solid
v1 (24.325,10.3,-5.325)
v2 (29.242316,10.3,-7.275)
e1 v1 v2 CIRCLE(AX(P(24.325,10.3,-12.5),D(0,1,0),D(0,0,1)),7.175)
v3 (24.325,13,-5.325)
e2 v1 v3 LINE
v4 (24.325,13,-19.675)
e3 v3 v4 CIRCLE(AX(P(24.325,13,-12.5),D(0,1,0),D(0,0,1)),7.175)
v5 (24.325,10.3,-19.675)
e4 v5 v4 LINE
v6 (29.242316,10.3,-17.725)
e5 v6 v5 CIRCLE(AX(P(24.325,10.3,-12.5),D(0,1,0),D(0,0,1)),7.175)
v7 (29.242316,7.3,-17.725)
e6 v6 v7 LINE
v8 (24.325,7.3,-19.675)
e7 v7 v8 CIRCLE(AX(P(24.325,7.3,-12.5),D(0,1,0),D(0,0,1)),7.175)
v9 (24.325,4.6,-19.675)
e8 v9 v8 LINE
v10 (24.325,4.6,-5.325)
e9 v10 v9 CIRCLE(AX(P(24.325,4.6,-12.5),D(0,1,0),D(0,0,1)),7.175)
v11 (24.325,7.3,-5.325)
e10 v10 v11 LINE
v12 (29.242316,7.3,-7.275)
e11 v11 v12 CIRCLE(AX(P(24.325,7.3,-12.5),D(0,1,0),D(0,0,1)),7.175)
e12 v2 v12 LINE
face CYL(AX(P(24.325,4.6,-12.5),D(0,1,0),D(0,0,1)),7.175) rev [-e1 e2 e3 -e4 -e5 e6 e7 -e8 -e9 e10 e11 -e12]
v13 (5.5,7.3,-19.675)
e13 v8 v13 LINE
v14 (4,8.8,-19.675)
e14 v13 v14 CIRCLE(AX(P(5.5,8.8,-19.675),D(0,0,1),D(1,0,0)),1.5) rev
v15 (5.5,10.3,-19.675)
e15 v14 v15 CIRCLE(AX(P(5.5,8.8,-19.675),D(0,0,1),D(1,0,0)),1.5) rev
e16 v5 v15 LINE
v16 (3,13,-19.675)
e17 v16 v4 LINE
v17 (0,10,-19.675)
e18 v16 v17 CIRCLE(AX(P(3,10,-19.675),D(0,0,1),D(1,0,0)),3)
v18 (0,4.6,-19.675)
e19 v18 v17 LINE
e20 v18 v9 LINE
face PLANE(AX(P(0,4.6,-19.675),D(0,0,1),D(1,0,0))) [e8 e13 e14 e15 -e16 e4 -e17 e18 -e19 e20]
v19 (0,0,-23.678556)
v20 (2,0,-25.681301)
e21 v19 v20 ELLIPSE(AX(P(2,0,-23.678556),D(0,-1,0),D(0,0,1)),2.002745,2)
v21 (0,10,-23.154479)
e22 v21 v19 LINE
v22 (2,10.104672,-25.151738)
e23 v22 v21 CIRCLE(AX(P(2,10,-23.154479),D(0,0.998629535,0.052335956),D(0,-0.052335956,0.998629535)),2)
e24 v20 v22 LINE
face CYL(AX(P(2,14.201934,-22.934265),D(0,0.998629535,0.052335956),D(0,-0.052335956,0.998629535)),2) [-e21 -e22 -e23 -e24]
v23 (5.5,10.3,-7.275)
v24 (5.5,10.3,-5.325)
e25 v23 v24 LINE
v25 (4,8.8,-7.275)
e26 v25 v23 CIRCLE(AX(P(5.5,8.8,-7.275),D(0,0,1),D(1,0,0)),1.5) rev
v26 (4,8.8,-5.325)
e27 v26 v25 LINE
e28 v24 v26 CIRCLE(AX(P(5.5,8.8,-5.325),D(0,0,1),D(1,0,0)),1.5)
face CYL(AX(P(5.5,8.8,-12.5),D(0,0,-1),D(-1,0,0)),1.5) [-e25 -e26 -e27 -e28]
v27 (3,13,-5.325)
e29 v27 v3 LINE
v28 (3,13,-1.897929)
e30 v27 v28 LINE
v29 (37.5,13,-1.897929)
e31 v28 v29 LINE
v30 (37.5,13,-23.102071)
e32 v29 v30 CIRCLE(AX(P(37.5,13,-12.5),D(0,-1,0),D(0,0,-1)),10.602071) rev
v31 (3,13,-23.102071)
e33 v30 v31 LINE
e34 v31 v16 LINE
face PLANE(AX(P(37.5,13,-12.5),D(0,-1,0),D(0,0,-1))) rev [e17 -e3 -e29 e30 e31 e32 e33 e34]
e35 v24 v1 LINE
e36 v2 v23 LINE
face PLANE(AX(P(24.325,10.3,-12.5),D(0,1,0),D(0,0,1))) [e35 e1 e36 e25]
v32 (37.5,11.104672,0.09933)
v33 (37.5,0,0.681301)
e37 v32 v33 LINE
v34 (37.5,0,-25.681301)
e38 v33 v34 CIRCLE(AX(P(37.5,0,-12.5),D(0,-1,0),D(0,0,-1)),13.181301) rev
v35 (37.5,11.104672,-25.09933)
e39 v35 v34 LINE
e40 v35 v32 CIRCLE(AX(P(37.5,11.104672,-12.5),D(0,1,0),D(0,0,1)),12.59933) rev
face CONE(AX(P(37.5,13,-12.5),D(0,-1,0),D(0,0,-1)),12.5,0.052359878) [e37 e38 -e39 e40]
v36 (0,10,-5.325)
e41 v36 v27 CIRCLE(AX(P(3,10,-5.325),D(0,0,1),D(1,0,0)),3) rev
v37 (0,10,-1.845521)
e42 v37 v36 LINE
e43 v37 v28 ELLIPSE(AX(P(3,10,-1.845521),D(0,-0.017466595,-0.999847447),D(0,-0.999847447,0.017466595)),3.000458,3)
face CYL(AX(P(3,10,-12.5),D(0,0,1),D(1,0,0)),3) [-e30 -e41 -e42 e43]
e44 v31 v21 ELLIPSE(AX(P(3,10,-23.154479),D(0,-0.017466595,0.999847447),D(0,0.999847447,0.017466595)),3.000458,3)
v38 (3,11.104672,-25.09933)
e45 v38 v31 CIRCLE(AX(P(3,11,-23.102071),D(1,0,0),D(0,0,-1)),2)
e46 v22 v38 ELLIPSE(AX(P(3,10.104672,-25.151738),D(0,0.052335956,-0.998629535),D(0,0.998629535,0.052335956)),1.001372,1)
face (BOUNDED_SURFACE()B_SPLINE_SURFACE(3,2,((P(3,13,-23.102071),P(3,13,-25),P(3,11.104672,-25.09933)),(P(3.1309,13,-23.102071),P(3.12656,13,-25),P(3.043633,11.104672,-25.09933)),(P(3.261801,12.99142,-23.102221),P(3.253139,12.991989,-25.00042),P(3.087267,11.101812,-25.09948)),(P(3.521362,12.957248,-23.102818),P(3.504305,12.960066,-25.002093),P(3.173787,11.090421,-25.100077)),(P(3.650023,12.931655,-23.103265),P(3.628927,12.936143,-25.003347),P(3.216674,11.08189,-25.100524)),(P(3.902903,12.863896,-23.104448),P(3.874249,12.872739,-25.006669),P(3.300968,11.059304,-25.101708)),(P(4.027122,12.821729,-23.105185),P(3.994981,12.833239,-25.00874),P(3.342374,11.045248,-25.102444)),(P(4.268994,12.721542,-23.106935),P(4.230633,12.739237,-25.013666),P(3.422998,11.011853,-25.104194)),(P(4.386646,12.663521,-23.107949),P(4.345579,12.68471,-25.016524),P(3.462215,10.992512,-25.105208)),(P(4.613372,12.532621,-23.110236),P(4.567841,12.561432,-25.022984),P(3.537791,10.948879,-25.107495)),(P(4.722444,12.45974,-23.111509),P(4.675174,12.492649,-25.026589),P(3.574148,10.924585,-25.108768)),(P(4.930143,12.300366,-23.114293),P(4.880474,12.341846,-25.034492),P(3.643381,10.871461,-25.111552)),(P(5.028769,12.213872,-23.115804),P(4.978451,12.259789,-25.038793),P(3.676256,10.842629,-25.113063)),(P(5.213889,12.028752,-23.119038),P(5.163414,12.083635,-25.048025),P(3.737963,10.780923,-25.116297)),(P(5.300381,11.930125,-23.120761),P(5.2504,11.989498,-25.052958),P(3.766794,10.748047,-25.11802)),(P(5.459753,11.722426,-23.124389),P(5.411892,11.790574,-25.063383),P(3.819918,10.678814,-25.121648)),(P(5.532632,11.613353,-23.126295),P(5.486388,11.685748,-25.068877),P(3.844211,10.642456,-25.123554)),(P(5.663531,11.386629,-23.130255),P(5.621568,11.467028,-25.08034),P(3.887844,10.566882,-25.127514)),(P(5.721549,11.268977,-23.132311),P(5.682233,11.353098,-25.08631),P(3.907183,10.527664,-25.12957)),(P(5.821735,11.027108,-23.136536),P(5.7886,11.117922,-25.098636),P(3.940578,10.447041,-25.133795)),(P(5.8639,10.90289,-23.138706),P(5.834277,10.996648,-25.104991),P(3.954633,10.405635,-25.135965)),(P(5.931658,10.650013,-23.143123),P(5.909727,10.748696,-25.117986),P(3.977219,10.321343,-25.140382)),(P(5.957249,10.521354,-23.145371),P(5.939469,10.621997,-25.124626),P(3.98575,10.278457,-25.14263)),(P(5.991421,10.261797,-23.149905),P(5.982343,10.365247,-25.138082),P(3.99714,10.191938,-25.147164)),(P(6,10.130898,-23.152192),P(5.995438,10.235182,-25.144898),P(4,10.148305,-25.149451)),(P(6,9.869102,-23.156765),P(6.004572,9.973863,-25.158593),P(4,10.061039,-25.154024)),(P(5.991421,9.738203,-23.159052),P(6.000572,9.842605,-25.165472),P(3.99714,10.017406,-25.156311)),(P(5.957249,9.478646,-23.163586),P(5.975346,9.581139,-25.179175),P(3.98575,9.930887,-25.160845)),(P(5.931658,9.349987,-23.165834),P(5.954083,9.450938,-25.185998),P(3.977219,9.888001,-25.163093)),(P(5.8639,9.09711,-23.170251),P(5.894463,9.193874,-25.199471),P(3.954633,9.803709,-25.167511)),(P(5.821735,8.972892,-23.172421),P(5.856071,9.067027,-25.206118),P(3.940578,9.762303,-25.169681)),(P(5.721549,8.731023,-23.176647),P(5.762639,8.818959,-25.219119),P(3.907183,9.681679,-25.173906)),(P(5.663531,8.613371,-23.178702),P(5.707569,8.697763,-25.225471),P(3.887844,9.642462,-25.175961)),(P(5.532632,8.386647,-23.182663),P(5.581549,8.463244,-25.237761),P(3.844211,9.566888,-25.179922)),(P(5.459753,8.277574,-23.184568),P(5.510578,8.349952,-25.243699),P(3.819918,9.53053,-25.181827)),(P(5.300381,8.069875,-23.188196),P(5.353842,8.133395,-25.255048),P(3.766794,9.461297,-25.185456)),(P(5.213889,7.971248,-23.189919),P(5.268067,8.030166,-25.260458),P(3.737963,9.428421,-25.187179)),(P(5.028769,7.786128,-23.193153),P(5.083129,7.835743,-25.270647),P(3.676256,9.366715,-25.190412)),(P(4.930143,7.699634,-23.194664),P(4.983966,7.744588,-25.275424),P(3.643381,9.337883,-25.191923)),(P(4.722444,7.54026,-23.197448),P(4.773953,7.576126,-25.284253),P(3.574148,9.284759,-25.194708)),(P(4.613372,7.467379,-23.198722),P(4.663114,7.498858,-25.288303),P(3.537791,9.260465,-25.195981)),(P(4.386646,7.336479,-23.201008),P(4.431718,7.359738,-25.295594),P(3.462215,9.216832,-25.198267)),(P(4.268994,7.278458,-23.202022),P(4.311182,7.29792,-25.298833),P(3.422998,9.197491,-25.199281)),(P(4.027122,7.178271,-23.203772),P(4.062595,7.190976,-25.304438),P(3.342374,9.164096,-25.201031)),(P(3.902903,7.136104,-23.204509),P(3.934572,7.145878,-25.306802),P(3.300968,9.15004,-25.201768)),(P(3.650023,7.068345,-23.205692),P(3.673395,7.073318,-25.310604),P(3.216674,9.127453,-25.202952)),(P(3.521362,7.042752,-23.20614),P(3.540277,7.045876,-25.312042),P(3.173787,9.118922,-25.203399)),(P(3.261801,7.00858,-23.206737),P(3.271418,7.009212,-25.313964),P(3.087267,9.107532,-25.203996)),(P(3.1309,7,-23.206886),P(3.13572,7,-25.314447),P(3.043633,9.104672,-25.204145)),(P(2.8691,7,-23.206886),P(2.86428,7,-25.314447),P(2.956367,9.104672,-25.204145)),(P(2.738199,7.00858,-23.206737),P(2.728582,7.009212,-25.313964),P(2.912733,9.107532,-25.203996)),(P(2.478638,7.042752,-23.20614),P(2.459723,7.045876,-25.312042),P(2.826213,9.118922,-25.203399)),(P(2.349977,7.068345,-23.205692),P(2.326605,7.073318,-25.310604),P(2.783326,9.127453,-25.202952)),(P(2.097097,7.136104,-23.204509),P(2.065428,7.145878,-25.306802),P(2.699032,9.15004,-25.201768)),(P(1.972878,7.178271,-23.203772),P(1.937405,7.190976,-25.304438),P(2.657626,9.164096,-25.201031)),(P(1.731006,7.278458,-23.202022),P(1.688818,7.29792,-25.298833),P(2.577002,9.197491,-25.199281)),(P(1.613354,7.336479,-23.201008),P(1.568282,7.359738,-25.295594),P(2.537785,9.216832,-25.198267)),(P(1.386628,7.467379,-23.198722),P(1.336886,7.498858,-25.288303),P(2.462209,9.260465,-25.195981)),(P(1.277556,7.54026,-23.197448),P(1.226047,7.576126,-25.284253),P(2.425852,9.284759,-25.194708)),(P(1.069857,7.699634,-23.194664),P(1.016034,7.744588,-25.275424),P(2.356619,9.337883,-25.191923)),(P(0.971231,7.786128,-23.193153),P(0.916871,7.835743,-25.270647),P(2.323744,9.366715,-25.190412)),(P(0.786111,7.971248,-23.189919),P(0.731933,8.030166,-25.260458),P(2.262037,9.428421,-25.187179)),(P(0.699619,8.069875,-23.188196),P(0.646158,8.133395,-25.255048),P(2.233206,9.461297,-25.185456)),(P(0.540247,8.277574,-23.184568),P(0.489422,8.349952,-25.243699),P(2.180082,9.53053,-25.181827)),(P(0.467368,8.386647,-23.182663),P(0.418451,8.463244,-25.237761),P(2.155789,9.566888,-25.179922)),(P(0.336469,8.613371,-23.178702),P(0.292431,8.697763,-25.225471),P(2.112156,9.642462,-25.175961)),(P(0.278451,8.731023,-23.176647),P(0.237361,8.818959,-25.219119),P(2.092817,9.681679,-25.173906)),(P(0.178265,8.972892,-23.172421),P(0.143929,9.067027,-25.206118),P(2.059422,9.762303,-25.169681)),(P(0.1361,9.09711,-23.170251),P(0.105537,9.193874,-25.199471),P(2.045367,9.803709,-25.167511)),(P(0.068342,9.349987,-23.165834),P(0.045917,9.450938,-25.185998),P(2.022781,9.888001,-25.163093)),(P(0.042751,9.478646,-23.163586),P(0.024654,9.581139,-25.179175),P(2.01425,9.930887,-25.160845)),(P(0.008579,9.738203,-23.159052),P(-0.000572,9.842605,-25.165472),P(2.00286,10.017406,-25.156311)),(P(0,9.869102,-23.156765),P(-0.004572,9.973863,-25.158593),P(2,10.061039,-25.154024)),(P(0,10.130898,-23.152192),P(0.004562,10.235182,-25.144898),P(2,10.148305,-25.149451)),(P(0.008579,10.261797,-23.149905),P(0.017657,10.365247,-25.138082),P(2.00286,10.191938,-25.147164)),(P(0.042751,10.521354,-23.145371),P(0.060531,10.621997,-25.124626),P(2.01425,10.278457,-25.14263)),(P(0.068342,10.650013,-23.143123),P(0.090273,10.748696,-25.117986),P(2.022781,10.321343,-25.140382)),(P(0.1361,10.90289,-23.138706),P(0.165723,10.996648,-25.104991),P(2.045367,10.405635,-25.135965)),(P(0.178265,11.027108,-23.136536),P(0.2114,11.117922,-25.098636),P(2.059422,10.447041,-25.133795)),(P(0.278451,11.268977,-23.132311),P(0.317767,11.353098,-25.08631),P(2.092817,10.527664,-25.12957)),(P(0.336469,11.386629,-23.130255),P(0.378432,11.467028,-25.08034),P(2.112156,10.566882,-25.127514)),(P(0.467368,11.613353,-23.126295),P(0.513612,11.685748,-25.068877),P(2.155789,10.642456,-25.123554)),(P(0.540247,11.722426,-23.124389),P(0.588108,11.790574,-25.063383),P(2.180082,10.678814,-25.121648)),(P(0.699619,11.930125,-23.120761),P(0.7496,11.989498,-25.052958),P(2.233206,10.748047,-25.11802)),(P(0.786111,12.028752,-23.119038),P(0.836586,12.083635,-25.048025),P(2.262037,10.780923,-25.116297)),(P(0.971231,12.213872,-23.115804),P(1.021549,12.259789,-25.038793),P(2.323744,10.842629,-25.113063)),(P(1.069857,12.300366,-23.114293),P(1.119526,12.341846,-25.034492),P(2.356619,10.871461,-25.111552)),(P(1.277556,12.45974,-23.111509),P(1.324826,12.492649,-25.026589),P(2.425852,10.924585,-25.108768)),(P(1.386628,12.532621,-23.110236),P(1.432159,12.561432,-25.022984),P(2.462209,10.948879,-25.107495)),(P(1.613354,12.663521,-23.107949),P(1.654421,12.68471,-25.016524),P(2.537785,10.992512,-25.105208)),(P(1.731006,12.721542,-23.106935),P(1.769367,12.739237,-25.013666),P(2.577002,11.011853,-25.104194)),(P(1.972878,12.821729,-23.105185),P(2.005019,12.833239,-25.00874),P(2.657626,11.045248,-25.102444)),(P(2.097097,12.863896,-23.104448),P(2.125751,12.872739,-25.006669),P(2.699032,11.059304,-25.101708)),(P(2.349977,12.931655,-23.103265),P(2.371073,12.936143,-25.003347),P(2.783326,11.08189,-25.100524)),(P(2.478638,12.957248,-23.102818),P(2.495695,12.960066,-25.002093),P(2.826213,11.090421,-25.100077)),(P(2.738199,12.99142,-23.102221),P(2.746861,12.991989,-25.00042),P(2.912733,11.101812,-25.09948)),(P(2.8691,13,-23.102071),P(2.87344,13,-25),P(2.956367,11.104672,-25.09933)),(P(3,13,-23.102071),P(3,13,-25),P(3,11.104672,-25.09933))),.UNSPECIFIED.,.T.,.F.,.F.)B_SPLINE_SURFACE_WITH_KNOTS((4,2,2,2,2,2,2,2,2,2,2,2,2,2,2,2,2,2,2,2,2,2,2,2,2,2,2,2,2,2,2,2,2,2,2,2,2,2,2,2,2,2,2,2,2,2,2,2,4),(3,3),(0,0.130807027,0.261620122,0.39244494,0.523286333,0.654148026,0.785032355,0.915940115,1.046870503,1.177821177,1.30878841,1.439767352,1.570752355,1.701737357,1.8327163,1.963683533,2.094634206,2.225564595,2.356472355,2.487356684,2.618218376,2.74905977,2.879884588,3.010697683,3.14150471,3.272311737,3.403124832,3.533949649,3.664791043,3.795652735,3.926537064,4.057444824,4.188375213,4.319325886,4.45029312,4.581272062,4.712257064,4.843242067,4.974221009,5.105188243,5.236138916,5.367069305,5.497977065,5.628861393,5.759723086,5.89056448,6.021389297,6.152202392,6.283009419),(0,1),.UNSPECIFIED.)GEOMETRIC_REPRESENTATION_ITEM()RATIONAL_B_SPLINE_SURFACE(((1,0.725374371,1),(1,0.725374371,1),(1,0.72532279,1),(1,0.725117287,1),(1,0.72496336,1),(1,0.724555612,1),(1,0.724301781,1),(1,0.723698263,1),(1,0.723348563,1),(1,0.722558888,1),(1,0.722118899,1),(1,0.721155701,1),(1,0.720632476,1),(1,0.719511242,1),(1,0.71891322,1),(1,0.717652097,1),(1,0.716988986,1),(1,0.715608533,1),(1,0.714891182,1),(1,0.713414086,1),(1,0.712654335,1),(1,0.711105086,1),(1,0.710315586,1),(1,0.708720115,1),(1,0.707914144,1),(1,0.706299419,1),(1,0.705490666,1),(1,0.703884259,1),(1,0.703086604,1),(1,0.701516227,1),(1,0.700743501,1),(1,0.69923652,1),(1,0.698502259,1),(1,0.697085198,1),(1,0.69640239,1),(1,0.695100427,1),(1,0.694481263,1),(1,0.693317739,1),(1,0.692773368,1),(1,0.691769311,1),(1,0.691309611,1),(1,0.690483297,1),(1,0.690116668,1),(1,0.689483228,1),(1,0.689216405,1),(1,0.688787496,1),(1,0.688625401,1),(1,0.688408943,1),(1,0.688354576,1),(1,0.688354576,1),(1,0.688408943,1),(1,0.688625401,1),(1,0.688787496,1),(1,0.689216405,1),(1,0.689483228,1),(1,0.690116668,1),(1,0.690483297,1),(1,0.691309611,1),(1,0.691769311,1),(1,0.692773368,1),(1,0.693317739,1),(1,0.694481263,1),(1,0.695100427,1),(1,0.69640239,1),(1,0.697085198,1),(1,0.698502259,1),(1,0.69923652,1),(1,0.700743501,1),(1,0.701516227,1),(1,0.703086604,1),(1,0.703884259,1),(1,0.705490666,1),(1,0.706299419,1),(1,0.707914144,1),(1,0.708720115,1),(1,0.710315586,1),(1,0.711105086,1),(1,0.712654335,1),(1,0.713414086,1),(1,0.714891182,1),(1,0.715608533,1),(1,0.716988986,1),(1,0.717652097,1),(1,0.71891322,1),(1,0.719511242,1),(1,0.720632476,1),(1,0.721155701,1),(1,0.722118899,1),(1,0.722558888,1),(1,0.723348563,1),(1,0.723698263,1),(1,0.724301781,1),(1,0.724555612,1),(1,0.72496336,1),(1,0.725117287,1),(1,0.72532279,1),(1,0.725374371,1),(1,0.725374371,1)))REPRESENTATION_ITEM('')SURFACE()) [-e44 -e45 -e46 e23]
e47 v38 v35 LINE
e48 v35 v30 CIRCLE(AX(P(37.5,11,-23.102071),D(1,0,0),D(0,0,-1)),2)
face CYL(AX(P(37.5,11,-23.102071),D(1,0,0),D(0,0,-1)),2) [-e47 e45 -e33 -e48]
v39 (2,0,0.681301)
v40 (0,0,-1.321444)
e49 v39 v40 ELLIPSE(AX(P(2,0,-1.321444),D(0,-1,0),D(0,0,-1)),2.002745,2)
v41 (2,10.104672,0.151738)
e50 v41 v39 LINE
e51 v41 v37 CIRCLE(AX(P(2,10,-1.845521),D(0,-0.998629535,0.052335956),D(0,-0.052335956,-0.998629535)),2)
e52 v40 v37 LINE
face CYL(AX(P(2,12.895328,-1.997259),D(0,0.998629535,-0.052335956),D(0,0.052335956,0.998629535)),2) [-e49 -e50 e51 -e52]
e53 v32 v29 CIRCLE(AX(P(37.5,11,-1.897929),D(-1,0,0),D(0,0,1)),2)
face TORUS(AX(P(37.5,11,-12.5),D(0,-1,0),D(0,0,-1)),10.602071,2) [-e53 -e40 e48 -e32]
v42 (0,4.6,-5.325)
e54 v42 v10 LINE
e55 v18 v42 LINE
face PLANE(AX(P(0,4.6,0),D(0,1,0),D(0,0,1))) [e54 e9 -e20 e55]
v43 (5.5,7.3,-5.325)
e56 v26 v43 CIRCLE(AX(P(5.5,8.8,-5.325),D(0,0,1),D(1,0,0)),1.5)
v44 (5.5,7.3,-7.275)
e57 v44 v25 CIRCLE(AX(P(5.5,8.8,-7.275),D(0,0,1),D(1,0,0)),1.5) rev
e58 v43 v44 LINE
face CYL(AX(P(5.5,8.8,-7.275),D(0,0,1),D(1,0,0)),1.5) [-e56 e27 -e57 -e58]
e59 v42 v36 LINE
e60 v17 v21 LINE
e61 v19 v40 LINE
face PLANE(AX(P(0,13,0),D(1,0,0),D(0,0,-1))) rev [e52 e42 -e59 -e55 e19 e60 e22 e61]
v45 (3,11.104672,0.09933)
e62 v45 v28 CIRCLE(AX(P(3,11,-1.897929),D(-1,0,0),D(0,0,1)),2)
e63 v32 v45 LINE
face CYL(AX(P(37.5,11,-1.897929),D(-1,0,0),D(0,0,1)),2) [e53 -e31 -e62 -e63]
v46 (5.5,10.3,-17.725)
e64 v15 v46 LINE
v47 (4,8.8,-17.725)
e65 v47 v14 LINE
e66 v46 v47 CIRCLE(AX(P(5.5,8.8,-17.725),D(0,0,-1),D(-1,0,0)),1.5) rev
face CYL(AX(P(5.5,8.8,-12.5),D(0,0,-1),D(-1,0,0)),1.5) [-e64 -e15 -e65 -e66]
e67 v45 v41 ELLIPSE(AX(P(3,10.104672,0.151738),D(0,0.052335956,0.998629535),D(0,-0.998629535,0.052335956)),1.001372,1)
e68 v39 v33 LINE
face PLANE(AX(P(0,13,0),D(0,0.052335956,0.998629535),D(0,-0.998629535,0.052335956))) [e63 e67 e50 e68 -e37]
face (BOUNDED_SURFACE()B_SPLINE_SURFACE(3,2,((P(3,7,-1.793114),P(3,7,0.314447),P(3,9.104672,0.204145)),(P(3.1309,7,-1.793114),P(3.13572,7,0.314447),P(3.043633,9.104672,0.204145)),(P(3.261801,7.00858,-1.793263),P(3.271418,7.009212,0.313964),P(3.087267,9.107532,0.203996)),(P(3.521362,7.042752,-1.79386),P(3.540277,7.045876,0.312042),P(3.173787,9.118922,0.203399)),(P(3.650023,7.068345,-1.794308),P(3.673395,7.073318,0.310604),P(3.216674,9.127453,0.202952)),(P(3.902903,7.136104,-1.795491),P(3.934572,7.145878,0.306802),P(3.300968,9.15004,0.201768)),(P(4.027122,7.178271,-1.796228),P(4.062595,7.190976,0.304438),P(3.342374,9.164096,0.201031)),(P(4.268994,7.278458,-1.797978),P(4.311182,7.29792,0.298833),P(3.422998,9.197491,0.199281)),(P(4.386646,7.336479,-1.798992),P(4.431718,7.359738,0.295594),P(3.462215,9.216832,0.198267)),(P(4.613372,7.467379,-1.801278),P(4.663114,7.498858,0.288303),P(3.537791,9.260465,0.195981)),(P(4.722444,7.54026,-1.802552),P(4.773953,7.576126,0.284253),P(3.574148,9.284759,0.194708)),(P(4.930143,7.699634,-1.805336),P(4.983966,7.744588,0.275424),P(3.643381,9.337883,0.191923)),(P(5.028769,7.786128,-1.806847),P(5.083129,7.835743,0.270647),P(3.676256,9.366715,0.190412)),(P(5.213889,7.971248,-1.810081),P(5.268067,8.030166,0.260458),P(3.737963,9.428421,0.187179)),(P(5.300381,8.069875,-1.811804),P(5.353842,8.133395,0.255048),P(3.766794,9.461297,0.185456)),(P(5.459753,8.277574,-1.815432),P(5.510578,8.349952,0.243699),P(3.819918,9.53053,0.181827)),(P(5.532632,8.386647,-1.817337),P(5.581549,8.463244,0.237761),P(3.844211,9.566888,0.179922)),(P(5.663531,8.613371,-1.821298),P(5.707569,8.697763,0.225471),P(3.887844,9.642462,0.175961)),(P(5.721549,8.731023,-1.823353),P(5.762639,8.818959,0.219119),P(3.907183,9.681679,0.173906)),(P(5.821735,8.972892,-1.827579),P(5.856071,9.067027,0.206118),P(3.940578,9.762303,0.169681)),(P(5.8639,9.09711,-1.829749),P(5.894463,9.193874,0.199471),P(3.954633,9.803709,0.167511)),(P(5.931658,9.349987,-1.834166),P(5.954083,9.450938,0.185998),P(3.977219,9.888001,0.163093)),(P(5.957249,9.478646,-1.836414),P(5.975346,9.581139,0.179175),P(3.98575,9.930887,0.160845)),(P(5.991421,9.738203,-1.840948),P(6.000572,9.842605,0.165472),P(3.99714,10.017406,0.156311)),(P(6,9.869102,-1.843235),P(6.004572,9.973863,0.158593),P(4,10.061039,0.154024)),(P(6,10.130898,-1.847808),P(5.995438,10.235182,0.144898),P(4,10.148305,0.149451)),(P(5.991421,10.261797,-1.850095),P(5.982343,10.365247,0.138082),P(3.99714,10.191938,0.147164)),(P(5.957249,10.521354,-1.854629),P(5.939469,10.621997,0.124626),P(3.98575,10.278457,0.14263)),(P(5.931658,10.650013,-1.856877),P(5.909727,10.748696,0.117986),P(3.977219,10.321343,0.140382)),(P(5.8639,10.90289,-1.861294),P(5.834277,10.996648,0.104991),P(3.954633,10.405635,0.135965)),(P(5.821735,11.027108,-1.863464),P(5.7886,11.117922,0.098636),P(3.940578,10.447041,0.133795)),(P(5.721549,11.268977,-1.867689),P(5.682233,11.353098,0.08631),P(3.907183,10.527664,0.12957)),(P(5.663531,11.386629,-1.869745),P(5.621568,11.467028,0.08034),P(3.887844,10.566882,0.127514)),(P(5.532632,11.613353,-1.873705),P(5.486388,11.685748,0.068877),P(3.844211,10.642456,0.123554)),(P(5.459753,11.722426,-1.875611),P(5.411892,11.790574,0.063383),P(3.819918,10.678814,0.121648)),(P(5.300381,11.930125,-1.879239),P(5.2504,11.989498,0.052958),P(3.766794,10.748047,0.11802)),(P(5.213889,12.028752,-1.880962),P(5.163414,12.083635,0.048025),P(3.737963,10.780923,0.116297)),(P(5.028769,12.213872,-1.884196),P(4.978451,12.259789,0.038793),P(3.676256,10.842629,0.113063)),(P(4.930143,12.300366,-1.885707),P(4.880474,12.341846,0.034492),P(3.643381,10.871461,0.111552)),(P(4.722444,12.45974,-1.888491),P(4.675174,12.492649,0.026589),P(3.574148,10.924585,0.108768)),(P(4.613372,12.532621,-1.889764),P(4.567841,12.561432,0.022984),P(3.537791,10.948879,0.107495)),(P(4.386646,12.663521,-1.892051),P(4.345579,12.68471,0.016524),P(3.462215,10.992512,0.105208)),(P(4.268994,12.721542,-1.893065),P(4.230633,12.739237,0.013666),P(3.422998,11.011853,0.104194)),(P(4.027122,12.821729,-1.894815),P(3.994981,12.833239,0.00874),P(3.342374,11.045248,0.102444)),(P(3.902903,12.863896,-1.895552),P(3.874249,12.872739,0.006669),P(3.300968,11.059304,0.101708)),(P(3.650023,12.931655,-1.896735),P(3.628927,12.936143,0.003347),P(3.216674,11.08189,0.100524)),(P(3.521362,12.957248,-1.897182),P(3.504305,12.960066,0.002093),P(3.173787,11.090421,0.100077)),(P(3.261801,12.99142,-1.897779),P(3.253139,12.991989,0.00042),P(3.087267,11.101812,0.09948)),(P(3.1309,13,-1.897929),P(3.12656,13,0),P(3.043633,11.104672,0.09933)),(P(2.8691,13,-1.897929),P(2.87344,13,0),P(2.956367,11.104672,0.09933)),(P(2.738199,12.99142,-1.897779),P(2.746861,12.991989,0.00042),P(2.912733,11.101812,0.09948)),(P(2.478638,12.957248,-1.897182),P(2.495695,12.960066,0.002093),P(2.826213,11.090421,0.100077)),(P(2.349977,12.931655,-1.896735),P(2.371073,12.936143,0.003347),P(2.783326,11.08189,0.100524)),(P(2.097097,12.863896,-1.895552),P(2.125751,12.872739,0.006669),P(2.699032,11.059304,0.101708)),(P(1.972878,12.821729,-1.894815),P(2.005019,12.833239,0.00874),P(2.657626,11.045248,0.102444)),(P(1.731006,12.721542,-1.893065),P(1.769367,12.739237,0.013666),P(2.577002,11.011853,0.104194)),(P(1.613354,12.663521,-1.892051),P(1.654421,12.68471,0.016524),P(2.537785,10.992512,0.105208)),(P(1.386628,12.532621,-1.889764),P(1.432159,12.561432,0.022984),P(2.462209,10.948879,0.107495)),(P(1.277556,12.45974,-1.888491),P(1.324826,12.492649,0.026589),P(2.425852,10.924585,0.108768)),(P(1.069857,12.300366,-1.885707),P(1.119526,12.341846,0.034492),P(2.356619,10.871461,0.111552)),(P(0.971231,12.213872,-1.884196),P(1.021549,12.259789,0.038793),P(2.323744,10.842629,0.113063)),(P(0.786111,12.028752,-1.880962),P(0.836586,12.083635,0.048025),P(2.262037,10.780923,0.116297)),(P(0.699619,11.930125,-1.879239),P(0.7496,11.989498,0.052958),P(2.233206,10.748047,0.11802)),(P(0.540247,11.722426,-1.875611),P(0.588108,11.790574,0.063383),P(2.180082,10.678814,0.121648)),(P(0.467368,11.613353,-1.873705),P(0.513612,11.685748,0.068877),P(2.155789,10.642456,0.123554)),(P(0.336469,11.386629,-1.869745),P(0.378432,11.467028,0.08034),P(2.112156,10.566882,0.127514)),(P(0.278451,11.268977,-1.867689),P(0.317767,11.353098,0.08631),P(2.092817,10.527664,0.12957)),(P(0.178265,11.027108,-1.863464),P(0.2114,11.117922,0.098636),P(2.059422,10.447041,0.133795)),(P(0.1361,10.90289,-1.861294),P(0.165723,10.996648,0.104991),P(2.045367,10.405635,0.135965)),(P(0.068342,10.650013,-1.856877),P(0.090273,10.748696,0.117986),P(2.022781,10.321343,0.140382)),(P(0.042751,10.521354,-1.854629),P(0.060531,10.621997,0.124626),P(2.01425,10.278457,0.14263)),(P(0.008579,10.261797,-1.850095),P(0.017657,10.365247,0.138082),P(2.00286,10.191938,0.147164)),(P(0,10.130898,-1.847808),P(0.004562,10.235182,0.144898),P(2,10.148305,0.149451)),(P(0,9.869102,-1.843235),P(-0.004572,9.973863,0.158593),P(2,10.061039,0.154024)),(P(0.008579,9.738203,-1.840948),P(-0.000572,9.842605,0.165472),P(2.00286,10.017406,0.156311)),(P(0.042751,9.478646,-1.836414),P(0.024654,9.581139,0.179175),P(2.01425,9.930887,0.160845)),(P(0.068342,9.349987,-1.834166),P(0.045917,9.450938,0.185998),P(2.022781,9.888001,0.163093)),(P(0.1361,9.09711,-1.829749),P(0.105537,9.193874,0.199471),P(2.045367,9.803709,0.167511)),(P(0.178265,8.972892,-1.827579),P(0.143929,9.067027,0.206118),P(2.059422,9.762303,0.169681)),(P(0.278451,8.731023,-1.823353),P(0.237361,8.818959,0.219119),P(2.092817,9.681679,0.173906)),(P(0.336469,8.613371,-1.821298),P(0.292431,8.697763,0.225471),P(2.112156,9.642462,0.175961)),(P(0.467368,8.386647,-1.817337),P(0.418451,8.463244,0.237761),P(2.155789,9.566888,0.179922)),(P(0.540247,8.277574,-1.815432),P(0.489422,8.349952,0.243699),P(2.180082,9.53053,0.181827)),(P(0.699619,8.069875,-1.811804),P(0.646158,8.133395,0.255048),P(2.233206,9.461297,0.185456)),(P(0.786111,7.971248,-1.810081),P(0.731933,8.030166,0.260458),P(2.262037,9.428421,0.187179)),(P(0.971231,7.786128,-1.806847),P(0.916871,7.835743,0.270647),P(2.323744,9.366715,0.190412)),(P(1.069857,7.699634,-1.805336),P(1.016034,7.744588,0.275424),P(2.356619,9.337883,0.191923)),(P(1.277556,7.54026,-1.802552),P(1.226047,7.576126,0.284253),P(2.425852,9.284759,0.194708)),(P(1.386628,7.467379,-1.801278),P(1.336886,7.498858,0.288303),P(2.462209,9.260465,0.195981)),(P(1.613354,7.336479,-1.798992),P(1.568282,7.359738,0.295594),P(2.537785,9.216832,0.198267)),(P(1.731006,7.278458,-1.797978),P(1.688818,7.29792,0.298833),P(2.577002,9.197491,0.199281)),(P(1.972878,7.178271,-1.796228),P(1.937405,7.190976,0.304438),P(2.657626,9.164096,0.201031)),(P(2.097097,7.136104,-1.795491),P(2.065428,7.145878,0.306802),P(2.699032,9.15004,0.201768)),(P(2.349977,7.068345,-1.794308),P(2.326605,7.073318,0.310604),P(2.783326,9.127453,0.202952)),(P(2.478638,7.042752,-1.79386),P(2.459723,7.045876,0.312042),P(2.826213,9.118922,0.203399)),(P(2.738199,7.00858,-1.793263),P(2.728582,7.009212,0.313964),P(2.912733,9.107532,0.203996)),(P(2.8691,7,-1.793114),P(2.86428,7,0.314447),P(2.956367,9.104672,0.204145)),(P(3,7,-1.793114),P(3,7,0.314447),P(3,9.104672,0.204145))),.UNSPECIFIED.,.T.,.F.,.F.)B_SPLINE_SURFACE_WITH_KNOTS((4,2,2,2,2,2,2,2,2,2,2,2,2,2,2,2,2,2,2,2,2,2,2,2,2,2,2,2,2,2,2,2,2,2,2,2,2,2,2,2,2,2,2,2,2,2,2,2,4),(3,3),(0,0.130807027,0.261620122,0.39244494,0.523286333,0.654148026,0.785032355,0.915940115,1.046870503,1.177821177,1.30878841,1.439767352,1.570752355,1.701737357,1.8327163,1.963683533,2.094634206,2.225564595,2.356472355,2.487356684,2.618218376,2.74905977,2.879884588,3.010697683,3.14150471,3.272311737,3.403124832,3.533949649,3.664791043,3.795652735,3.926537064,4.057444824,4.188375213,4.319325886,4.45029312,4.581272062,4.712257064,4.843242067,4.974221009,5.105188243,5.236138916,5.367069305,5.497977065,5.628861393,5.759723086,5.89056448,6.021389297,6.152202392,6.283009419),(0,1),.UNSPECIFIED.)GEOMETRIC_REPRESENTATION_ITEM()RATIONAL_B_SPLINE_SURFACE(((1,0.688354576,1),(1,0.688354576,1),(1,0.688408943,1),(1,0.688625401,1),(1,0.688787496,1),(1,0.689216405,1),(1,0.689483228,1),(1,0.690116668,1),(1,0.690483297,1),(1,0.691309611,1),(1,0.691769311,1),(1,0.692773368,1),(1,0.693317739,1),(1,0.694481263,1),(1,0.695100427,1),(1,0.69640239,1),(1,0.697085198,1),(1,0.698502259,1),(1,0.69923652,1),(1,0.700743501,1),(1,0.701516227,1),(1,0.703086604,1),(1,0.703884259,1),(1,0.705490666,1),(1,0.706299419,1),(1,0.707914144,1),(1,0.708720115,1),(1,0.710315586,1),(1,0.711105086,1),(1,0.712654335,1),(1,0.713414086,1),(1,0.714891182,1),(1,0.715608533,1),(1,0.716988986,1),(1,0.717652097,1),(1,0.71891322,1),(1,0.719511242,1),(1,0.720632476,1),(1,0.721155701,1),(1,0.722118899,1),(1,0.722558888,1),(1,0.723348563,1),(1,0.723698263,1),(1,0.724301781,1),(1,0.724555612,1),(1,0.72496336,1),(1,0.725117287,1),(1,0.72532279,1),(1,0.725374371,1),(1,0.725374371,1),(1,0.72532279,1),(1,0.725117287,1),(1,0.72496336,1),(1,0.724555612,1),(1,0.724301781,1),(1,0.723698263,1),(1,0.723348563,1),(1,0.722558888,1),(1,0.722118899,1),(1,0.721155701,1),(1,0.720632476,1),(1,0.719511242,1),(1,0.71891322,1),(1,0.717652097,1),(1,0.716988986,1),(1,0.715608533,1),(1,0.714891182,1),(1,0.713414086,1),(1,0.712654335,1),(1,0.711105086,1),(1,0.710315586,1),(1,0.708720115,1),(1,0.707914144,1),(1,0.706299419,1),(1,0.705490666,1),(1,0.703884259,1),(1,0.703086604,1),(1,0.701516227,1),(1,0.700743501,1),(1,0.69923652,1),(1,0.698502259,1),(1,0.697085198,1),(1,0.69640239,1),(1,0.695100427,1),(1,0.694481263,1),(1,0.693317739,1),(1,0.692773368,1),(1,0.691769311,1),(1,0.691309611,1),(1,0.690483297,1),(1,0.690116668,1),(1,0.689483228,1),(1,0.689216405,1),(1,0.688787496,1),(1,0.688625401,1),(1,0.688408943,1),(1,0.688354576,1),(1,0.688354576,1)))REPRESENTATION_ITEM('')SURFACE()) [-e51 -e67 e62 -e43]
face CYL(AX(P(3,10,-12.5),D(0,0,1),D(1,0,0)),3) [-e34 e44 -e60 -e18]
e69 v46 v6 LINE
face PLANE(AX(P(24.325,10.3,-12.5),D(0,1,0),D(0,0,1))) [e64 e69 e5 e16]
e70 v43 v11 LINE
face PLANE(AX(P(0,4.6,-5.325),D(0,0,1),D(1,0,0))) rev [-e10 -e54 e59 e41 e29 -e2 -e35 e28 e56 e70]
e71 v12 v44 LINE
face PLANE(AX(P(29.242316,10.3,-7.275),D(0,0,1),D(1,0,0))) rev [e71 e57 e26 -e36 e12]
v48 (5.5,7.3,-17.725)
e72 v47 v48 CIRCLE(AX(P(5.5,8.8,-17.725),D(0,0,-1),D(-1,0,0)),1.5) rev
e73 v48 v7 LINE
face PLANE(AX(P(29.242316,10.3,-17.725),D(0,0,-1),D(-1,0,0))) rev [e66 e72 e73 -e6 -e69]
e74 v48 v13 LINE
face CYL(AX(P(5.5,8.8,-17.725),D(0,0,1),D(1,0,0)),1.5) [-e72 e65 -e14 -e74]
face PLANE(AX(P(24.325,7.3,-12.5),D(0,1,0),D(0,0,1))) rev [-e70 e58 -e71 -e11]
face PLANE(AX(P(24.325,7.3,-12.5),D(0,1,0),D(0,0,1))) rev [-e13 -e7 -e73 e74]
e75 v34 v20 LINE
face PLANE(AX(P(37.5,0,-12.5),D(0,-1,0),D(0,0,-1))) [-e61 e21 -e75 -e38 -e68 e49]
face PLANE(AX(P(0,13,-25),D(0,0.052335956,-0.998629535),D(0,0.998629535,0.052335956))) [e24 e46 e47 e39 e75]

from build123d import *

# Parameters (mm, degrees)
BOSS_EXTRUDE1_DEPTH = 13
CUT_EXTRUDE1_DEPTH  = 8.4
BOSS_EXTRUDE3_START = 5.7
BOSS_EXTRUDE3_DEPTH = 3
FILLET1_R           = 1.5
DRAFT2_ANGLE        = 3
FILLET2_R           = 3
FILLET3_R           = 2


with BuildPart() as part:
    # Sketch1 → Boss-Extrude1 (new body)
    with BuildSketch(Plane(origin=(0, 0, 0), x_dir=(1, 0, 0), z_dir=(0, 1, 0))):
        with BuildLine():
            Line((0, 0), (37.5, 0))
            ThreePointArc((37.5, 0), (50, 12.5), (37.5, 25))
            Line((37.5, 25), (0, 25))
            Line((0, 25), (0, 0))
        make_face()
    extrude(amount=BOSS_EXTRUDE1_DEPTH)

    # Sketch2 → Cut-Extrude1 (cut)
    with BuildSketch(Plane(origin=(0, 13, 0), x_dir=(1, 0, 0), z_dir=(0, 1, 0))):
        with BuildLine():
            Line((24.325, 19.675), (0, 19.675))
            Line((0, 19.675), (0, 5.325))
            Line((0, 5.325), (24.325, 5.325))
            ThreePointArc((24.325, 5.325), (31.5, 12.5), (24.325, 19.675))
        make_face()
    extrude(amount=-CUT_EXTRUDE1_DEPTH, mode=Mode.SUBTRACT)

    # Sketch3 → Boss-Extrude3 (add)
    with BuildSketch(Plane(origin=(0, 4.6, 0), x_dir=(1, 0, 0), z_dir=(0, 1, 0)).offset(BOSS_EXTRUDE3_START)):
        with BuildLine():
            Line((4, 5.325), (24.325, 5.325))
            ThreePointArc((24.325, 5.325), (26.969924385, 5.83029236), (29.242316341, 7.275))
            Line((29.242316341, 7.275), (4, 7.275))
            Line((4, 7.275), (4, 5.325))
        make_face()
        with BuildLine():
            Line((4, 19.675), (24.325, 19.675))
            ThreePointArc((24.325, 19.675), (26.969924385, 19.16970764), (29.242316341, 17.725))
            Line((29.242316341, 17.725), (4, 17.725))
            Line((4, 17.725), (4, 19.675))
        make_face()
    extrude(amount=-BOSS_EXTRUDE3_DEPTH)

    # Fillet1
    fillet1_edges = [part.edges().sort_by_distance(p)[0] for p in [
        (4, 7.3, -6.3),
        (4, 10.3, -6.3),
        (4, 7.3, -18.7),
        (4, 10.3, -18.7),
    ]]
    fillet(fillet1_edges, radius=FILLET1_R - 0.0001)  # a hair under: the kernel refuses the full size

    # Draft2
    draft2_faces = [part.faces().sort_by_distance(p)[0] for p in [
        (18.75, 6.5, -25),
        (50, 6.5, -12.5),
        (18.75, 6.5, 0),
    ]]
    draft(draft2_faces, Plane(origin=(37.5, 13, -12.5), x_dir=(0, 0, 1), z_dir=(0, 1, 0)), DRAFT2_ANGLE)

    # Fillet2
    fillet2_edges = [part.edges().sort_by_distance(p)[0] for p in [
        (0, 13, -2.6625),
        (0, 13, -22.3375),
    ]]
    fillet(fillet2_edges, radius=FILLET2_R)

    # Fillet3
    fillet3_edges = [part.edges().sort_by_distance(p)[0] for p in [
        (50, 13, -12.5),
        (20.25, 13, -25),
        (20.25, 13, 0),
        (0, 5, -25.419262234),
        (0, 5, 0.419262234),
        (0.877952484, 12.120592922, -25.046087772),
        (0.877952484, 12.120592922, 0.046087772),
    ]]
    fillet(fillet3_edges, radius=FILLET3_R)


solid = part.part
